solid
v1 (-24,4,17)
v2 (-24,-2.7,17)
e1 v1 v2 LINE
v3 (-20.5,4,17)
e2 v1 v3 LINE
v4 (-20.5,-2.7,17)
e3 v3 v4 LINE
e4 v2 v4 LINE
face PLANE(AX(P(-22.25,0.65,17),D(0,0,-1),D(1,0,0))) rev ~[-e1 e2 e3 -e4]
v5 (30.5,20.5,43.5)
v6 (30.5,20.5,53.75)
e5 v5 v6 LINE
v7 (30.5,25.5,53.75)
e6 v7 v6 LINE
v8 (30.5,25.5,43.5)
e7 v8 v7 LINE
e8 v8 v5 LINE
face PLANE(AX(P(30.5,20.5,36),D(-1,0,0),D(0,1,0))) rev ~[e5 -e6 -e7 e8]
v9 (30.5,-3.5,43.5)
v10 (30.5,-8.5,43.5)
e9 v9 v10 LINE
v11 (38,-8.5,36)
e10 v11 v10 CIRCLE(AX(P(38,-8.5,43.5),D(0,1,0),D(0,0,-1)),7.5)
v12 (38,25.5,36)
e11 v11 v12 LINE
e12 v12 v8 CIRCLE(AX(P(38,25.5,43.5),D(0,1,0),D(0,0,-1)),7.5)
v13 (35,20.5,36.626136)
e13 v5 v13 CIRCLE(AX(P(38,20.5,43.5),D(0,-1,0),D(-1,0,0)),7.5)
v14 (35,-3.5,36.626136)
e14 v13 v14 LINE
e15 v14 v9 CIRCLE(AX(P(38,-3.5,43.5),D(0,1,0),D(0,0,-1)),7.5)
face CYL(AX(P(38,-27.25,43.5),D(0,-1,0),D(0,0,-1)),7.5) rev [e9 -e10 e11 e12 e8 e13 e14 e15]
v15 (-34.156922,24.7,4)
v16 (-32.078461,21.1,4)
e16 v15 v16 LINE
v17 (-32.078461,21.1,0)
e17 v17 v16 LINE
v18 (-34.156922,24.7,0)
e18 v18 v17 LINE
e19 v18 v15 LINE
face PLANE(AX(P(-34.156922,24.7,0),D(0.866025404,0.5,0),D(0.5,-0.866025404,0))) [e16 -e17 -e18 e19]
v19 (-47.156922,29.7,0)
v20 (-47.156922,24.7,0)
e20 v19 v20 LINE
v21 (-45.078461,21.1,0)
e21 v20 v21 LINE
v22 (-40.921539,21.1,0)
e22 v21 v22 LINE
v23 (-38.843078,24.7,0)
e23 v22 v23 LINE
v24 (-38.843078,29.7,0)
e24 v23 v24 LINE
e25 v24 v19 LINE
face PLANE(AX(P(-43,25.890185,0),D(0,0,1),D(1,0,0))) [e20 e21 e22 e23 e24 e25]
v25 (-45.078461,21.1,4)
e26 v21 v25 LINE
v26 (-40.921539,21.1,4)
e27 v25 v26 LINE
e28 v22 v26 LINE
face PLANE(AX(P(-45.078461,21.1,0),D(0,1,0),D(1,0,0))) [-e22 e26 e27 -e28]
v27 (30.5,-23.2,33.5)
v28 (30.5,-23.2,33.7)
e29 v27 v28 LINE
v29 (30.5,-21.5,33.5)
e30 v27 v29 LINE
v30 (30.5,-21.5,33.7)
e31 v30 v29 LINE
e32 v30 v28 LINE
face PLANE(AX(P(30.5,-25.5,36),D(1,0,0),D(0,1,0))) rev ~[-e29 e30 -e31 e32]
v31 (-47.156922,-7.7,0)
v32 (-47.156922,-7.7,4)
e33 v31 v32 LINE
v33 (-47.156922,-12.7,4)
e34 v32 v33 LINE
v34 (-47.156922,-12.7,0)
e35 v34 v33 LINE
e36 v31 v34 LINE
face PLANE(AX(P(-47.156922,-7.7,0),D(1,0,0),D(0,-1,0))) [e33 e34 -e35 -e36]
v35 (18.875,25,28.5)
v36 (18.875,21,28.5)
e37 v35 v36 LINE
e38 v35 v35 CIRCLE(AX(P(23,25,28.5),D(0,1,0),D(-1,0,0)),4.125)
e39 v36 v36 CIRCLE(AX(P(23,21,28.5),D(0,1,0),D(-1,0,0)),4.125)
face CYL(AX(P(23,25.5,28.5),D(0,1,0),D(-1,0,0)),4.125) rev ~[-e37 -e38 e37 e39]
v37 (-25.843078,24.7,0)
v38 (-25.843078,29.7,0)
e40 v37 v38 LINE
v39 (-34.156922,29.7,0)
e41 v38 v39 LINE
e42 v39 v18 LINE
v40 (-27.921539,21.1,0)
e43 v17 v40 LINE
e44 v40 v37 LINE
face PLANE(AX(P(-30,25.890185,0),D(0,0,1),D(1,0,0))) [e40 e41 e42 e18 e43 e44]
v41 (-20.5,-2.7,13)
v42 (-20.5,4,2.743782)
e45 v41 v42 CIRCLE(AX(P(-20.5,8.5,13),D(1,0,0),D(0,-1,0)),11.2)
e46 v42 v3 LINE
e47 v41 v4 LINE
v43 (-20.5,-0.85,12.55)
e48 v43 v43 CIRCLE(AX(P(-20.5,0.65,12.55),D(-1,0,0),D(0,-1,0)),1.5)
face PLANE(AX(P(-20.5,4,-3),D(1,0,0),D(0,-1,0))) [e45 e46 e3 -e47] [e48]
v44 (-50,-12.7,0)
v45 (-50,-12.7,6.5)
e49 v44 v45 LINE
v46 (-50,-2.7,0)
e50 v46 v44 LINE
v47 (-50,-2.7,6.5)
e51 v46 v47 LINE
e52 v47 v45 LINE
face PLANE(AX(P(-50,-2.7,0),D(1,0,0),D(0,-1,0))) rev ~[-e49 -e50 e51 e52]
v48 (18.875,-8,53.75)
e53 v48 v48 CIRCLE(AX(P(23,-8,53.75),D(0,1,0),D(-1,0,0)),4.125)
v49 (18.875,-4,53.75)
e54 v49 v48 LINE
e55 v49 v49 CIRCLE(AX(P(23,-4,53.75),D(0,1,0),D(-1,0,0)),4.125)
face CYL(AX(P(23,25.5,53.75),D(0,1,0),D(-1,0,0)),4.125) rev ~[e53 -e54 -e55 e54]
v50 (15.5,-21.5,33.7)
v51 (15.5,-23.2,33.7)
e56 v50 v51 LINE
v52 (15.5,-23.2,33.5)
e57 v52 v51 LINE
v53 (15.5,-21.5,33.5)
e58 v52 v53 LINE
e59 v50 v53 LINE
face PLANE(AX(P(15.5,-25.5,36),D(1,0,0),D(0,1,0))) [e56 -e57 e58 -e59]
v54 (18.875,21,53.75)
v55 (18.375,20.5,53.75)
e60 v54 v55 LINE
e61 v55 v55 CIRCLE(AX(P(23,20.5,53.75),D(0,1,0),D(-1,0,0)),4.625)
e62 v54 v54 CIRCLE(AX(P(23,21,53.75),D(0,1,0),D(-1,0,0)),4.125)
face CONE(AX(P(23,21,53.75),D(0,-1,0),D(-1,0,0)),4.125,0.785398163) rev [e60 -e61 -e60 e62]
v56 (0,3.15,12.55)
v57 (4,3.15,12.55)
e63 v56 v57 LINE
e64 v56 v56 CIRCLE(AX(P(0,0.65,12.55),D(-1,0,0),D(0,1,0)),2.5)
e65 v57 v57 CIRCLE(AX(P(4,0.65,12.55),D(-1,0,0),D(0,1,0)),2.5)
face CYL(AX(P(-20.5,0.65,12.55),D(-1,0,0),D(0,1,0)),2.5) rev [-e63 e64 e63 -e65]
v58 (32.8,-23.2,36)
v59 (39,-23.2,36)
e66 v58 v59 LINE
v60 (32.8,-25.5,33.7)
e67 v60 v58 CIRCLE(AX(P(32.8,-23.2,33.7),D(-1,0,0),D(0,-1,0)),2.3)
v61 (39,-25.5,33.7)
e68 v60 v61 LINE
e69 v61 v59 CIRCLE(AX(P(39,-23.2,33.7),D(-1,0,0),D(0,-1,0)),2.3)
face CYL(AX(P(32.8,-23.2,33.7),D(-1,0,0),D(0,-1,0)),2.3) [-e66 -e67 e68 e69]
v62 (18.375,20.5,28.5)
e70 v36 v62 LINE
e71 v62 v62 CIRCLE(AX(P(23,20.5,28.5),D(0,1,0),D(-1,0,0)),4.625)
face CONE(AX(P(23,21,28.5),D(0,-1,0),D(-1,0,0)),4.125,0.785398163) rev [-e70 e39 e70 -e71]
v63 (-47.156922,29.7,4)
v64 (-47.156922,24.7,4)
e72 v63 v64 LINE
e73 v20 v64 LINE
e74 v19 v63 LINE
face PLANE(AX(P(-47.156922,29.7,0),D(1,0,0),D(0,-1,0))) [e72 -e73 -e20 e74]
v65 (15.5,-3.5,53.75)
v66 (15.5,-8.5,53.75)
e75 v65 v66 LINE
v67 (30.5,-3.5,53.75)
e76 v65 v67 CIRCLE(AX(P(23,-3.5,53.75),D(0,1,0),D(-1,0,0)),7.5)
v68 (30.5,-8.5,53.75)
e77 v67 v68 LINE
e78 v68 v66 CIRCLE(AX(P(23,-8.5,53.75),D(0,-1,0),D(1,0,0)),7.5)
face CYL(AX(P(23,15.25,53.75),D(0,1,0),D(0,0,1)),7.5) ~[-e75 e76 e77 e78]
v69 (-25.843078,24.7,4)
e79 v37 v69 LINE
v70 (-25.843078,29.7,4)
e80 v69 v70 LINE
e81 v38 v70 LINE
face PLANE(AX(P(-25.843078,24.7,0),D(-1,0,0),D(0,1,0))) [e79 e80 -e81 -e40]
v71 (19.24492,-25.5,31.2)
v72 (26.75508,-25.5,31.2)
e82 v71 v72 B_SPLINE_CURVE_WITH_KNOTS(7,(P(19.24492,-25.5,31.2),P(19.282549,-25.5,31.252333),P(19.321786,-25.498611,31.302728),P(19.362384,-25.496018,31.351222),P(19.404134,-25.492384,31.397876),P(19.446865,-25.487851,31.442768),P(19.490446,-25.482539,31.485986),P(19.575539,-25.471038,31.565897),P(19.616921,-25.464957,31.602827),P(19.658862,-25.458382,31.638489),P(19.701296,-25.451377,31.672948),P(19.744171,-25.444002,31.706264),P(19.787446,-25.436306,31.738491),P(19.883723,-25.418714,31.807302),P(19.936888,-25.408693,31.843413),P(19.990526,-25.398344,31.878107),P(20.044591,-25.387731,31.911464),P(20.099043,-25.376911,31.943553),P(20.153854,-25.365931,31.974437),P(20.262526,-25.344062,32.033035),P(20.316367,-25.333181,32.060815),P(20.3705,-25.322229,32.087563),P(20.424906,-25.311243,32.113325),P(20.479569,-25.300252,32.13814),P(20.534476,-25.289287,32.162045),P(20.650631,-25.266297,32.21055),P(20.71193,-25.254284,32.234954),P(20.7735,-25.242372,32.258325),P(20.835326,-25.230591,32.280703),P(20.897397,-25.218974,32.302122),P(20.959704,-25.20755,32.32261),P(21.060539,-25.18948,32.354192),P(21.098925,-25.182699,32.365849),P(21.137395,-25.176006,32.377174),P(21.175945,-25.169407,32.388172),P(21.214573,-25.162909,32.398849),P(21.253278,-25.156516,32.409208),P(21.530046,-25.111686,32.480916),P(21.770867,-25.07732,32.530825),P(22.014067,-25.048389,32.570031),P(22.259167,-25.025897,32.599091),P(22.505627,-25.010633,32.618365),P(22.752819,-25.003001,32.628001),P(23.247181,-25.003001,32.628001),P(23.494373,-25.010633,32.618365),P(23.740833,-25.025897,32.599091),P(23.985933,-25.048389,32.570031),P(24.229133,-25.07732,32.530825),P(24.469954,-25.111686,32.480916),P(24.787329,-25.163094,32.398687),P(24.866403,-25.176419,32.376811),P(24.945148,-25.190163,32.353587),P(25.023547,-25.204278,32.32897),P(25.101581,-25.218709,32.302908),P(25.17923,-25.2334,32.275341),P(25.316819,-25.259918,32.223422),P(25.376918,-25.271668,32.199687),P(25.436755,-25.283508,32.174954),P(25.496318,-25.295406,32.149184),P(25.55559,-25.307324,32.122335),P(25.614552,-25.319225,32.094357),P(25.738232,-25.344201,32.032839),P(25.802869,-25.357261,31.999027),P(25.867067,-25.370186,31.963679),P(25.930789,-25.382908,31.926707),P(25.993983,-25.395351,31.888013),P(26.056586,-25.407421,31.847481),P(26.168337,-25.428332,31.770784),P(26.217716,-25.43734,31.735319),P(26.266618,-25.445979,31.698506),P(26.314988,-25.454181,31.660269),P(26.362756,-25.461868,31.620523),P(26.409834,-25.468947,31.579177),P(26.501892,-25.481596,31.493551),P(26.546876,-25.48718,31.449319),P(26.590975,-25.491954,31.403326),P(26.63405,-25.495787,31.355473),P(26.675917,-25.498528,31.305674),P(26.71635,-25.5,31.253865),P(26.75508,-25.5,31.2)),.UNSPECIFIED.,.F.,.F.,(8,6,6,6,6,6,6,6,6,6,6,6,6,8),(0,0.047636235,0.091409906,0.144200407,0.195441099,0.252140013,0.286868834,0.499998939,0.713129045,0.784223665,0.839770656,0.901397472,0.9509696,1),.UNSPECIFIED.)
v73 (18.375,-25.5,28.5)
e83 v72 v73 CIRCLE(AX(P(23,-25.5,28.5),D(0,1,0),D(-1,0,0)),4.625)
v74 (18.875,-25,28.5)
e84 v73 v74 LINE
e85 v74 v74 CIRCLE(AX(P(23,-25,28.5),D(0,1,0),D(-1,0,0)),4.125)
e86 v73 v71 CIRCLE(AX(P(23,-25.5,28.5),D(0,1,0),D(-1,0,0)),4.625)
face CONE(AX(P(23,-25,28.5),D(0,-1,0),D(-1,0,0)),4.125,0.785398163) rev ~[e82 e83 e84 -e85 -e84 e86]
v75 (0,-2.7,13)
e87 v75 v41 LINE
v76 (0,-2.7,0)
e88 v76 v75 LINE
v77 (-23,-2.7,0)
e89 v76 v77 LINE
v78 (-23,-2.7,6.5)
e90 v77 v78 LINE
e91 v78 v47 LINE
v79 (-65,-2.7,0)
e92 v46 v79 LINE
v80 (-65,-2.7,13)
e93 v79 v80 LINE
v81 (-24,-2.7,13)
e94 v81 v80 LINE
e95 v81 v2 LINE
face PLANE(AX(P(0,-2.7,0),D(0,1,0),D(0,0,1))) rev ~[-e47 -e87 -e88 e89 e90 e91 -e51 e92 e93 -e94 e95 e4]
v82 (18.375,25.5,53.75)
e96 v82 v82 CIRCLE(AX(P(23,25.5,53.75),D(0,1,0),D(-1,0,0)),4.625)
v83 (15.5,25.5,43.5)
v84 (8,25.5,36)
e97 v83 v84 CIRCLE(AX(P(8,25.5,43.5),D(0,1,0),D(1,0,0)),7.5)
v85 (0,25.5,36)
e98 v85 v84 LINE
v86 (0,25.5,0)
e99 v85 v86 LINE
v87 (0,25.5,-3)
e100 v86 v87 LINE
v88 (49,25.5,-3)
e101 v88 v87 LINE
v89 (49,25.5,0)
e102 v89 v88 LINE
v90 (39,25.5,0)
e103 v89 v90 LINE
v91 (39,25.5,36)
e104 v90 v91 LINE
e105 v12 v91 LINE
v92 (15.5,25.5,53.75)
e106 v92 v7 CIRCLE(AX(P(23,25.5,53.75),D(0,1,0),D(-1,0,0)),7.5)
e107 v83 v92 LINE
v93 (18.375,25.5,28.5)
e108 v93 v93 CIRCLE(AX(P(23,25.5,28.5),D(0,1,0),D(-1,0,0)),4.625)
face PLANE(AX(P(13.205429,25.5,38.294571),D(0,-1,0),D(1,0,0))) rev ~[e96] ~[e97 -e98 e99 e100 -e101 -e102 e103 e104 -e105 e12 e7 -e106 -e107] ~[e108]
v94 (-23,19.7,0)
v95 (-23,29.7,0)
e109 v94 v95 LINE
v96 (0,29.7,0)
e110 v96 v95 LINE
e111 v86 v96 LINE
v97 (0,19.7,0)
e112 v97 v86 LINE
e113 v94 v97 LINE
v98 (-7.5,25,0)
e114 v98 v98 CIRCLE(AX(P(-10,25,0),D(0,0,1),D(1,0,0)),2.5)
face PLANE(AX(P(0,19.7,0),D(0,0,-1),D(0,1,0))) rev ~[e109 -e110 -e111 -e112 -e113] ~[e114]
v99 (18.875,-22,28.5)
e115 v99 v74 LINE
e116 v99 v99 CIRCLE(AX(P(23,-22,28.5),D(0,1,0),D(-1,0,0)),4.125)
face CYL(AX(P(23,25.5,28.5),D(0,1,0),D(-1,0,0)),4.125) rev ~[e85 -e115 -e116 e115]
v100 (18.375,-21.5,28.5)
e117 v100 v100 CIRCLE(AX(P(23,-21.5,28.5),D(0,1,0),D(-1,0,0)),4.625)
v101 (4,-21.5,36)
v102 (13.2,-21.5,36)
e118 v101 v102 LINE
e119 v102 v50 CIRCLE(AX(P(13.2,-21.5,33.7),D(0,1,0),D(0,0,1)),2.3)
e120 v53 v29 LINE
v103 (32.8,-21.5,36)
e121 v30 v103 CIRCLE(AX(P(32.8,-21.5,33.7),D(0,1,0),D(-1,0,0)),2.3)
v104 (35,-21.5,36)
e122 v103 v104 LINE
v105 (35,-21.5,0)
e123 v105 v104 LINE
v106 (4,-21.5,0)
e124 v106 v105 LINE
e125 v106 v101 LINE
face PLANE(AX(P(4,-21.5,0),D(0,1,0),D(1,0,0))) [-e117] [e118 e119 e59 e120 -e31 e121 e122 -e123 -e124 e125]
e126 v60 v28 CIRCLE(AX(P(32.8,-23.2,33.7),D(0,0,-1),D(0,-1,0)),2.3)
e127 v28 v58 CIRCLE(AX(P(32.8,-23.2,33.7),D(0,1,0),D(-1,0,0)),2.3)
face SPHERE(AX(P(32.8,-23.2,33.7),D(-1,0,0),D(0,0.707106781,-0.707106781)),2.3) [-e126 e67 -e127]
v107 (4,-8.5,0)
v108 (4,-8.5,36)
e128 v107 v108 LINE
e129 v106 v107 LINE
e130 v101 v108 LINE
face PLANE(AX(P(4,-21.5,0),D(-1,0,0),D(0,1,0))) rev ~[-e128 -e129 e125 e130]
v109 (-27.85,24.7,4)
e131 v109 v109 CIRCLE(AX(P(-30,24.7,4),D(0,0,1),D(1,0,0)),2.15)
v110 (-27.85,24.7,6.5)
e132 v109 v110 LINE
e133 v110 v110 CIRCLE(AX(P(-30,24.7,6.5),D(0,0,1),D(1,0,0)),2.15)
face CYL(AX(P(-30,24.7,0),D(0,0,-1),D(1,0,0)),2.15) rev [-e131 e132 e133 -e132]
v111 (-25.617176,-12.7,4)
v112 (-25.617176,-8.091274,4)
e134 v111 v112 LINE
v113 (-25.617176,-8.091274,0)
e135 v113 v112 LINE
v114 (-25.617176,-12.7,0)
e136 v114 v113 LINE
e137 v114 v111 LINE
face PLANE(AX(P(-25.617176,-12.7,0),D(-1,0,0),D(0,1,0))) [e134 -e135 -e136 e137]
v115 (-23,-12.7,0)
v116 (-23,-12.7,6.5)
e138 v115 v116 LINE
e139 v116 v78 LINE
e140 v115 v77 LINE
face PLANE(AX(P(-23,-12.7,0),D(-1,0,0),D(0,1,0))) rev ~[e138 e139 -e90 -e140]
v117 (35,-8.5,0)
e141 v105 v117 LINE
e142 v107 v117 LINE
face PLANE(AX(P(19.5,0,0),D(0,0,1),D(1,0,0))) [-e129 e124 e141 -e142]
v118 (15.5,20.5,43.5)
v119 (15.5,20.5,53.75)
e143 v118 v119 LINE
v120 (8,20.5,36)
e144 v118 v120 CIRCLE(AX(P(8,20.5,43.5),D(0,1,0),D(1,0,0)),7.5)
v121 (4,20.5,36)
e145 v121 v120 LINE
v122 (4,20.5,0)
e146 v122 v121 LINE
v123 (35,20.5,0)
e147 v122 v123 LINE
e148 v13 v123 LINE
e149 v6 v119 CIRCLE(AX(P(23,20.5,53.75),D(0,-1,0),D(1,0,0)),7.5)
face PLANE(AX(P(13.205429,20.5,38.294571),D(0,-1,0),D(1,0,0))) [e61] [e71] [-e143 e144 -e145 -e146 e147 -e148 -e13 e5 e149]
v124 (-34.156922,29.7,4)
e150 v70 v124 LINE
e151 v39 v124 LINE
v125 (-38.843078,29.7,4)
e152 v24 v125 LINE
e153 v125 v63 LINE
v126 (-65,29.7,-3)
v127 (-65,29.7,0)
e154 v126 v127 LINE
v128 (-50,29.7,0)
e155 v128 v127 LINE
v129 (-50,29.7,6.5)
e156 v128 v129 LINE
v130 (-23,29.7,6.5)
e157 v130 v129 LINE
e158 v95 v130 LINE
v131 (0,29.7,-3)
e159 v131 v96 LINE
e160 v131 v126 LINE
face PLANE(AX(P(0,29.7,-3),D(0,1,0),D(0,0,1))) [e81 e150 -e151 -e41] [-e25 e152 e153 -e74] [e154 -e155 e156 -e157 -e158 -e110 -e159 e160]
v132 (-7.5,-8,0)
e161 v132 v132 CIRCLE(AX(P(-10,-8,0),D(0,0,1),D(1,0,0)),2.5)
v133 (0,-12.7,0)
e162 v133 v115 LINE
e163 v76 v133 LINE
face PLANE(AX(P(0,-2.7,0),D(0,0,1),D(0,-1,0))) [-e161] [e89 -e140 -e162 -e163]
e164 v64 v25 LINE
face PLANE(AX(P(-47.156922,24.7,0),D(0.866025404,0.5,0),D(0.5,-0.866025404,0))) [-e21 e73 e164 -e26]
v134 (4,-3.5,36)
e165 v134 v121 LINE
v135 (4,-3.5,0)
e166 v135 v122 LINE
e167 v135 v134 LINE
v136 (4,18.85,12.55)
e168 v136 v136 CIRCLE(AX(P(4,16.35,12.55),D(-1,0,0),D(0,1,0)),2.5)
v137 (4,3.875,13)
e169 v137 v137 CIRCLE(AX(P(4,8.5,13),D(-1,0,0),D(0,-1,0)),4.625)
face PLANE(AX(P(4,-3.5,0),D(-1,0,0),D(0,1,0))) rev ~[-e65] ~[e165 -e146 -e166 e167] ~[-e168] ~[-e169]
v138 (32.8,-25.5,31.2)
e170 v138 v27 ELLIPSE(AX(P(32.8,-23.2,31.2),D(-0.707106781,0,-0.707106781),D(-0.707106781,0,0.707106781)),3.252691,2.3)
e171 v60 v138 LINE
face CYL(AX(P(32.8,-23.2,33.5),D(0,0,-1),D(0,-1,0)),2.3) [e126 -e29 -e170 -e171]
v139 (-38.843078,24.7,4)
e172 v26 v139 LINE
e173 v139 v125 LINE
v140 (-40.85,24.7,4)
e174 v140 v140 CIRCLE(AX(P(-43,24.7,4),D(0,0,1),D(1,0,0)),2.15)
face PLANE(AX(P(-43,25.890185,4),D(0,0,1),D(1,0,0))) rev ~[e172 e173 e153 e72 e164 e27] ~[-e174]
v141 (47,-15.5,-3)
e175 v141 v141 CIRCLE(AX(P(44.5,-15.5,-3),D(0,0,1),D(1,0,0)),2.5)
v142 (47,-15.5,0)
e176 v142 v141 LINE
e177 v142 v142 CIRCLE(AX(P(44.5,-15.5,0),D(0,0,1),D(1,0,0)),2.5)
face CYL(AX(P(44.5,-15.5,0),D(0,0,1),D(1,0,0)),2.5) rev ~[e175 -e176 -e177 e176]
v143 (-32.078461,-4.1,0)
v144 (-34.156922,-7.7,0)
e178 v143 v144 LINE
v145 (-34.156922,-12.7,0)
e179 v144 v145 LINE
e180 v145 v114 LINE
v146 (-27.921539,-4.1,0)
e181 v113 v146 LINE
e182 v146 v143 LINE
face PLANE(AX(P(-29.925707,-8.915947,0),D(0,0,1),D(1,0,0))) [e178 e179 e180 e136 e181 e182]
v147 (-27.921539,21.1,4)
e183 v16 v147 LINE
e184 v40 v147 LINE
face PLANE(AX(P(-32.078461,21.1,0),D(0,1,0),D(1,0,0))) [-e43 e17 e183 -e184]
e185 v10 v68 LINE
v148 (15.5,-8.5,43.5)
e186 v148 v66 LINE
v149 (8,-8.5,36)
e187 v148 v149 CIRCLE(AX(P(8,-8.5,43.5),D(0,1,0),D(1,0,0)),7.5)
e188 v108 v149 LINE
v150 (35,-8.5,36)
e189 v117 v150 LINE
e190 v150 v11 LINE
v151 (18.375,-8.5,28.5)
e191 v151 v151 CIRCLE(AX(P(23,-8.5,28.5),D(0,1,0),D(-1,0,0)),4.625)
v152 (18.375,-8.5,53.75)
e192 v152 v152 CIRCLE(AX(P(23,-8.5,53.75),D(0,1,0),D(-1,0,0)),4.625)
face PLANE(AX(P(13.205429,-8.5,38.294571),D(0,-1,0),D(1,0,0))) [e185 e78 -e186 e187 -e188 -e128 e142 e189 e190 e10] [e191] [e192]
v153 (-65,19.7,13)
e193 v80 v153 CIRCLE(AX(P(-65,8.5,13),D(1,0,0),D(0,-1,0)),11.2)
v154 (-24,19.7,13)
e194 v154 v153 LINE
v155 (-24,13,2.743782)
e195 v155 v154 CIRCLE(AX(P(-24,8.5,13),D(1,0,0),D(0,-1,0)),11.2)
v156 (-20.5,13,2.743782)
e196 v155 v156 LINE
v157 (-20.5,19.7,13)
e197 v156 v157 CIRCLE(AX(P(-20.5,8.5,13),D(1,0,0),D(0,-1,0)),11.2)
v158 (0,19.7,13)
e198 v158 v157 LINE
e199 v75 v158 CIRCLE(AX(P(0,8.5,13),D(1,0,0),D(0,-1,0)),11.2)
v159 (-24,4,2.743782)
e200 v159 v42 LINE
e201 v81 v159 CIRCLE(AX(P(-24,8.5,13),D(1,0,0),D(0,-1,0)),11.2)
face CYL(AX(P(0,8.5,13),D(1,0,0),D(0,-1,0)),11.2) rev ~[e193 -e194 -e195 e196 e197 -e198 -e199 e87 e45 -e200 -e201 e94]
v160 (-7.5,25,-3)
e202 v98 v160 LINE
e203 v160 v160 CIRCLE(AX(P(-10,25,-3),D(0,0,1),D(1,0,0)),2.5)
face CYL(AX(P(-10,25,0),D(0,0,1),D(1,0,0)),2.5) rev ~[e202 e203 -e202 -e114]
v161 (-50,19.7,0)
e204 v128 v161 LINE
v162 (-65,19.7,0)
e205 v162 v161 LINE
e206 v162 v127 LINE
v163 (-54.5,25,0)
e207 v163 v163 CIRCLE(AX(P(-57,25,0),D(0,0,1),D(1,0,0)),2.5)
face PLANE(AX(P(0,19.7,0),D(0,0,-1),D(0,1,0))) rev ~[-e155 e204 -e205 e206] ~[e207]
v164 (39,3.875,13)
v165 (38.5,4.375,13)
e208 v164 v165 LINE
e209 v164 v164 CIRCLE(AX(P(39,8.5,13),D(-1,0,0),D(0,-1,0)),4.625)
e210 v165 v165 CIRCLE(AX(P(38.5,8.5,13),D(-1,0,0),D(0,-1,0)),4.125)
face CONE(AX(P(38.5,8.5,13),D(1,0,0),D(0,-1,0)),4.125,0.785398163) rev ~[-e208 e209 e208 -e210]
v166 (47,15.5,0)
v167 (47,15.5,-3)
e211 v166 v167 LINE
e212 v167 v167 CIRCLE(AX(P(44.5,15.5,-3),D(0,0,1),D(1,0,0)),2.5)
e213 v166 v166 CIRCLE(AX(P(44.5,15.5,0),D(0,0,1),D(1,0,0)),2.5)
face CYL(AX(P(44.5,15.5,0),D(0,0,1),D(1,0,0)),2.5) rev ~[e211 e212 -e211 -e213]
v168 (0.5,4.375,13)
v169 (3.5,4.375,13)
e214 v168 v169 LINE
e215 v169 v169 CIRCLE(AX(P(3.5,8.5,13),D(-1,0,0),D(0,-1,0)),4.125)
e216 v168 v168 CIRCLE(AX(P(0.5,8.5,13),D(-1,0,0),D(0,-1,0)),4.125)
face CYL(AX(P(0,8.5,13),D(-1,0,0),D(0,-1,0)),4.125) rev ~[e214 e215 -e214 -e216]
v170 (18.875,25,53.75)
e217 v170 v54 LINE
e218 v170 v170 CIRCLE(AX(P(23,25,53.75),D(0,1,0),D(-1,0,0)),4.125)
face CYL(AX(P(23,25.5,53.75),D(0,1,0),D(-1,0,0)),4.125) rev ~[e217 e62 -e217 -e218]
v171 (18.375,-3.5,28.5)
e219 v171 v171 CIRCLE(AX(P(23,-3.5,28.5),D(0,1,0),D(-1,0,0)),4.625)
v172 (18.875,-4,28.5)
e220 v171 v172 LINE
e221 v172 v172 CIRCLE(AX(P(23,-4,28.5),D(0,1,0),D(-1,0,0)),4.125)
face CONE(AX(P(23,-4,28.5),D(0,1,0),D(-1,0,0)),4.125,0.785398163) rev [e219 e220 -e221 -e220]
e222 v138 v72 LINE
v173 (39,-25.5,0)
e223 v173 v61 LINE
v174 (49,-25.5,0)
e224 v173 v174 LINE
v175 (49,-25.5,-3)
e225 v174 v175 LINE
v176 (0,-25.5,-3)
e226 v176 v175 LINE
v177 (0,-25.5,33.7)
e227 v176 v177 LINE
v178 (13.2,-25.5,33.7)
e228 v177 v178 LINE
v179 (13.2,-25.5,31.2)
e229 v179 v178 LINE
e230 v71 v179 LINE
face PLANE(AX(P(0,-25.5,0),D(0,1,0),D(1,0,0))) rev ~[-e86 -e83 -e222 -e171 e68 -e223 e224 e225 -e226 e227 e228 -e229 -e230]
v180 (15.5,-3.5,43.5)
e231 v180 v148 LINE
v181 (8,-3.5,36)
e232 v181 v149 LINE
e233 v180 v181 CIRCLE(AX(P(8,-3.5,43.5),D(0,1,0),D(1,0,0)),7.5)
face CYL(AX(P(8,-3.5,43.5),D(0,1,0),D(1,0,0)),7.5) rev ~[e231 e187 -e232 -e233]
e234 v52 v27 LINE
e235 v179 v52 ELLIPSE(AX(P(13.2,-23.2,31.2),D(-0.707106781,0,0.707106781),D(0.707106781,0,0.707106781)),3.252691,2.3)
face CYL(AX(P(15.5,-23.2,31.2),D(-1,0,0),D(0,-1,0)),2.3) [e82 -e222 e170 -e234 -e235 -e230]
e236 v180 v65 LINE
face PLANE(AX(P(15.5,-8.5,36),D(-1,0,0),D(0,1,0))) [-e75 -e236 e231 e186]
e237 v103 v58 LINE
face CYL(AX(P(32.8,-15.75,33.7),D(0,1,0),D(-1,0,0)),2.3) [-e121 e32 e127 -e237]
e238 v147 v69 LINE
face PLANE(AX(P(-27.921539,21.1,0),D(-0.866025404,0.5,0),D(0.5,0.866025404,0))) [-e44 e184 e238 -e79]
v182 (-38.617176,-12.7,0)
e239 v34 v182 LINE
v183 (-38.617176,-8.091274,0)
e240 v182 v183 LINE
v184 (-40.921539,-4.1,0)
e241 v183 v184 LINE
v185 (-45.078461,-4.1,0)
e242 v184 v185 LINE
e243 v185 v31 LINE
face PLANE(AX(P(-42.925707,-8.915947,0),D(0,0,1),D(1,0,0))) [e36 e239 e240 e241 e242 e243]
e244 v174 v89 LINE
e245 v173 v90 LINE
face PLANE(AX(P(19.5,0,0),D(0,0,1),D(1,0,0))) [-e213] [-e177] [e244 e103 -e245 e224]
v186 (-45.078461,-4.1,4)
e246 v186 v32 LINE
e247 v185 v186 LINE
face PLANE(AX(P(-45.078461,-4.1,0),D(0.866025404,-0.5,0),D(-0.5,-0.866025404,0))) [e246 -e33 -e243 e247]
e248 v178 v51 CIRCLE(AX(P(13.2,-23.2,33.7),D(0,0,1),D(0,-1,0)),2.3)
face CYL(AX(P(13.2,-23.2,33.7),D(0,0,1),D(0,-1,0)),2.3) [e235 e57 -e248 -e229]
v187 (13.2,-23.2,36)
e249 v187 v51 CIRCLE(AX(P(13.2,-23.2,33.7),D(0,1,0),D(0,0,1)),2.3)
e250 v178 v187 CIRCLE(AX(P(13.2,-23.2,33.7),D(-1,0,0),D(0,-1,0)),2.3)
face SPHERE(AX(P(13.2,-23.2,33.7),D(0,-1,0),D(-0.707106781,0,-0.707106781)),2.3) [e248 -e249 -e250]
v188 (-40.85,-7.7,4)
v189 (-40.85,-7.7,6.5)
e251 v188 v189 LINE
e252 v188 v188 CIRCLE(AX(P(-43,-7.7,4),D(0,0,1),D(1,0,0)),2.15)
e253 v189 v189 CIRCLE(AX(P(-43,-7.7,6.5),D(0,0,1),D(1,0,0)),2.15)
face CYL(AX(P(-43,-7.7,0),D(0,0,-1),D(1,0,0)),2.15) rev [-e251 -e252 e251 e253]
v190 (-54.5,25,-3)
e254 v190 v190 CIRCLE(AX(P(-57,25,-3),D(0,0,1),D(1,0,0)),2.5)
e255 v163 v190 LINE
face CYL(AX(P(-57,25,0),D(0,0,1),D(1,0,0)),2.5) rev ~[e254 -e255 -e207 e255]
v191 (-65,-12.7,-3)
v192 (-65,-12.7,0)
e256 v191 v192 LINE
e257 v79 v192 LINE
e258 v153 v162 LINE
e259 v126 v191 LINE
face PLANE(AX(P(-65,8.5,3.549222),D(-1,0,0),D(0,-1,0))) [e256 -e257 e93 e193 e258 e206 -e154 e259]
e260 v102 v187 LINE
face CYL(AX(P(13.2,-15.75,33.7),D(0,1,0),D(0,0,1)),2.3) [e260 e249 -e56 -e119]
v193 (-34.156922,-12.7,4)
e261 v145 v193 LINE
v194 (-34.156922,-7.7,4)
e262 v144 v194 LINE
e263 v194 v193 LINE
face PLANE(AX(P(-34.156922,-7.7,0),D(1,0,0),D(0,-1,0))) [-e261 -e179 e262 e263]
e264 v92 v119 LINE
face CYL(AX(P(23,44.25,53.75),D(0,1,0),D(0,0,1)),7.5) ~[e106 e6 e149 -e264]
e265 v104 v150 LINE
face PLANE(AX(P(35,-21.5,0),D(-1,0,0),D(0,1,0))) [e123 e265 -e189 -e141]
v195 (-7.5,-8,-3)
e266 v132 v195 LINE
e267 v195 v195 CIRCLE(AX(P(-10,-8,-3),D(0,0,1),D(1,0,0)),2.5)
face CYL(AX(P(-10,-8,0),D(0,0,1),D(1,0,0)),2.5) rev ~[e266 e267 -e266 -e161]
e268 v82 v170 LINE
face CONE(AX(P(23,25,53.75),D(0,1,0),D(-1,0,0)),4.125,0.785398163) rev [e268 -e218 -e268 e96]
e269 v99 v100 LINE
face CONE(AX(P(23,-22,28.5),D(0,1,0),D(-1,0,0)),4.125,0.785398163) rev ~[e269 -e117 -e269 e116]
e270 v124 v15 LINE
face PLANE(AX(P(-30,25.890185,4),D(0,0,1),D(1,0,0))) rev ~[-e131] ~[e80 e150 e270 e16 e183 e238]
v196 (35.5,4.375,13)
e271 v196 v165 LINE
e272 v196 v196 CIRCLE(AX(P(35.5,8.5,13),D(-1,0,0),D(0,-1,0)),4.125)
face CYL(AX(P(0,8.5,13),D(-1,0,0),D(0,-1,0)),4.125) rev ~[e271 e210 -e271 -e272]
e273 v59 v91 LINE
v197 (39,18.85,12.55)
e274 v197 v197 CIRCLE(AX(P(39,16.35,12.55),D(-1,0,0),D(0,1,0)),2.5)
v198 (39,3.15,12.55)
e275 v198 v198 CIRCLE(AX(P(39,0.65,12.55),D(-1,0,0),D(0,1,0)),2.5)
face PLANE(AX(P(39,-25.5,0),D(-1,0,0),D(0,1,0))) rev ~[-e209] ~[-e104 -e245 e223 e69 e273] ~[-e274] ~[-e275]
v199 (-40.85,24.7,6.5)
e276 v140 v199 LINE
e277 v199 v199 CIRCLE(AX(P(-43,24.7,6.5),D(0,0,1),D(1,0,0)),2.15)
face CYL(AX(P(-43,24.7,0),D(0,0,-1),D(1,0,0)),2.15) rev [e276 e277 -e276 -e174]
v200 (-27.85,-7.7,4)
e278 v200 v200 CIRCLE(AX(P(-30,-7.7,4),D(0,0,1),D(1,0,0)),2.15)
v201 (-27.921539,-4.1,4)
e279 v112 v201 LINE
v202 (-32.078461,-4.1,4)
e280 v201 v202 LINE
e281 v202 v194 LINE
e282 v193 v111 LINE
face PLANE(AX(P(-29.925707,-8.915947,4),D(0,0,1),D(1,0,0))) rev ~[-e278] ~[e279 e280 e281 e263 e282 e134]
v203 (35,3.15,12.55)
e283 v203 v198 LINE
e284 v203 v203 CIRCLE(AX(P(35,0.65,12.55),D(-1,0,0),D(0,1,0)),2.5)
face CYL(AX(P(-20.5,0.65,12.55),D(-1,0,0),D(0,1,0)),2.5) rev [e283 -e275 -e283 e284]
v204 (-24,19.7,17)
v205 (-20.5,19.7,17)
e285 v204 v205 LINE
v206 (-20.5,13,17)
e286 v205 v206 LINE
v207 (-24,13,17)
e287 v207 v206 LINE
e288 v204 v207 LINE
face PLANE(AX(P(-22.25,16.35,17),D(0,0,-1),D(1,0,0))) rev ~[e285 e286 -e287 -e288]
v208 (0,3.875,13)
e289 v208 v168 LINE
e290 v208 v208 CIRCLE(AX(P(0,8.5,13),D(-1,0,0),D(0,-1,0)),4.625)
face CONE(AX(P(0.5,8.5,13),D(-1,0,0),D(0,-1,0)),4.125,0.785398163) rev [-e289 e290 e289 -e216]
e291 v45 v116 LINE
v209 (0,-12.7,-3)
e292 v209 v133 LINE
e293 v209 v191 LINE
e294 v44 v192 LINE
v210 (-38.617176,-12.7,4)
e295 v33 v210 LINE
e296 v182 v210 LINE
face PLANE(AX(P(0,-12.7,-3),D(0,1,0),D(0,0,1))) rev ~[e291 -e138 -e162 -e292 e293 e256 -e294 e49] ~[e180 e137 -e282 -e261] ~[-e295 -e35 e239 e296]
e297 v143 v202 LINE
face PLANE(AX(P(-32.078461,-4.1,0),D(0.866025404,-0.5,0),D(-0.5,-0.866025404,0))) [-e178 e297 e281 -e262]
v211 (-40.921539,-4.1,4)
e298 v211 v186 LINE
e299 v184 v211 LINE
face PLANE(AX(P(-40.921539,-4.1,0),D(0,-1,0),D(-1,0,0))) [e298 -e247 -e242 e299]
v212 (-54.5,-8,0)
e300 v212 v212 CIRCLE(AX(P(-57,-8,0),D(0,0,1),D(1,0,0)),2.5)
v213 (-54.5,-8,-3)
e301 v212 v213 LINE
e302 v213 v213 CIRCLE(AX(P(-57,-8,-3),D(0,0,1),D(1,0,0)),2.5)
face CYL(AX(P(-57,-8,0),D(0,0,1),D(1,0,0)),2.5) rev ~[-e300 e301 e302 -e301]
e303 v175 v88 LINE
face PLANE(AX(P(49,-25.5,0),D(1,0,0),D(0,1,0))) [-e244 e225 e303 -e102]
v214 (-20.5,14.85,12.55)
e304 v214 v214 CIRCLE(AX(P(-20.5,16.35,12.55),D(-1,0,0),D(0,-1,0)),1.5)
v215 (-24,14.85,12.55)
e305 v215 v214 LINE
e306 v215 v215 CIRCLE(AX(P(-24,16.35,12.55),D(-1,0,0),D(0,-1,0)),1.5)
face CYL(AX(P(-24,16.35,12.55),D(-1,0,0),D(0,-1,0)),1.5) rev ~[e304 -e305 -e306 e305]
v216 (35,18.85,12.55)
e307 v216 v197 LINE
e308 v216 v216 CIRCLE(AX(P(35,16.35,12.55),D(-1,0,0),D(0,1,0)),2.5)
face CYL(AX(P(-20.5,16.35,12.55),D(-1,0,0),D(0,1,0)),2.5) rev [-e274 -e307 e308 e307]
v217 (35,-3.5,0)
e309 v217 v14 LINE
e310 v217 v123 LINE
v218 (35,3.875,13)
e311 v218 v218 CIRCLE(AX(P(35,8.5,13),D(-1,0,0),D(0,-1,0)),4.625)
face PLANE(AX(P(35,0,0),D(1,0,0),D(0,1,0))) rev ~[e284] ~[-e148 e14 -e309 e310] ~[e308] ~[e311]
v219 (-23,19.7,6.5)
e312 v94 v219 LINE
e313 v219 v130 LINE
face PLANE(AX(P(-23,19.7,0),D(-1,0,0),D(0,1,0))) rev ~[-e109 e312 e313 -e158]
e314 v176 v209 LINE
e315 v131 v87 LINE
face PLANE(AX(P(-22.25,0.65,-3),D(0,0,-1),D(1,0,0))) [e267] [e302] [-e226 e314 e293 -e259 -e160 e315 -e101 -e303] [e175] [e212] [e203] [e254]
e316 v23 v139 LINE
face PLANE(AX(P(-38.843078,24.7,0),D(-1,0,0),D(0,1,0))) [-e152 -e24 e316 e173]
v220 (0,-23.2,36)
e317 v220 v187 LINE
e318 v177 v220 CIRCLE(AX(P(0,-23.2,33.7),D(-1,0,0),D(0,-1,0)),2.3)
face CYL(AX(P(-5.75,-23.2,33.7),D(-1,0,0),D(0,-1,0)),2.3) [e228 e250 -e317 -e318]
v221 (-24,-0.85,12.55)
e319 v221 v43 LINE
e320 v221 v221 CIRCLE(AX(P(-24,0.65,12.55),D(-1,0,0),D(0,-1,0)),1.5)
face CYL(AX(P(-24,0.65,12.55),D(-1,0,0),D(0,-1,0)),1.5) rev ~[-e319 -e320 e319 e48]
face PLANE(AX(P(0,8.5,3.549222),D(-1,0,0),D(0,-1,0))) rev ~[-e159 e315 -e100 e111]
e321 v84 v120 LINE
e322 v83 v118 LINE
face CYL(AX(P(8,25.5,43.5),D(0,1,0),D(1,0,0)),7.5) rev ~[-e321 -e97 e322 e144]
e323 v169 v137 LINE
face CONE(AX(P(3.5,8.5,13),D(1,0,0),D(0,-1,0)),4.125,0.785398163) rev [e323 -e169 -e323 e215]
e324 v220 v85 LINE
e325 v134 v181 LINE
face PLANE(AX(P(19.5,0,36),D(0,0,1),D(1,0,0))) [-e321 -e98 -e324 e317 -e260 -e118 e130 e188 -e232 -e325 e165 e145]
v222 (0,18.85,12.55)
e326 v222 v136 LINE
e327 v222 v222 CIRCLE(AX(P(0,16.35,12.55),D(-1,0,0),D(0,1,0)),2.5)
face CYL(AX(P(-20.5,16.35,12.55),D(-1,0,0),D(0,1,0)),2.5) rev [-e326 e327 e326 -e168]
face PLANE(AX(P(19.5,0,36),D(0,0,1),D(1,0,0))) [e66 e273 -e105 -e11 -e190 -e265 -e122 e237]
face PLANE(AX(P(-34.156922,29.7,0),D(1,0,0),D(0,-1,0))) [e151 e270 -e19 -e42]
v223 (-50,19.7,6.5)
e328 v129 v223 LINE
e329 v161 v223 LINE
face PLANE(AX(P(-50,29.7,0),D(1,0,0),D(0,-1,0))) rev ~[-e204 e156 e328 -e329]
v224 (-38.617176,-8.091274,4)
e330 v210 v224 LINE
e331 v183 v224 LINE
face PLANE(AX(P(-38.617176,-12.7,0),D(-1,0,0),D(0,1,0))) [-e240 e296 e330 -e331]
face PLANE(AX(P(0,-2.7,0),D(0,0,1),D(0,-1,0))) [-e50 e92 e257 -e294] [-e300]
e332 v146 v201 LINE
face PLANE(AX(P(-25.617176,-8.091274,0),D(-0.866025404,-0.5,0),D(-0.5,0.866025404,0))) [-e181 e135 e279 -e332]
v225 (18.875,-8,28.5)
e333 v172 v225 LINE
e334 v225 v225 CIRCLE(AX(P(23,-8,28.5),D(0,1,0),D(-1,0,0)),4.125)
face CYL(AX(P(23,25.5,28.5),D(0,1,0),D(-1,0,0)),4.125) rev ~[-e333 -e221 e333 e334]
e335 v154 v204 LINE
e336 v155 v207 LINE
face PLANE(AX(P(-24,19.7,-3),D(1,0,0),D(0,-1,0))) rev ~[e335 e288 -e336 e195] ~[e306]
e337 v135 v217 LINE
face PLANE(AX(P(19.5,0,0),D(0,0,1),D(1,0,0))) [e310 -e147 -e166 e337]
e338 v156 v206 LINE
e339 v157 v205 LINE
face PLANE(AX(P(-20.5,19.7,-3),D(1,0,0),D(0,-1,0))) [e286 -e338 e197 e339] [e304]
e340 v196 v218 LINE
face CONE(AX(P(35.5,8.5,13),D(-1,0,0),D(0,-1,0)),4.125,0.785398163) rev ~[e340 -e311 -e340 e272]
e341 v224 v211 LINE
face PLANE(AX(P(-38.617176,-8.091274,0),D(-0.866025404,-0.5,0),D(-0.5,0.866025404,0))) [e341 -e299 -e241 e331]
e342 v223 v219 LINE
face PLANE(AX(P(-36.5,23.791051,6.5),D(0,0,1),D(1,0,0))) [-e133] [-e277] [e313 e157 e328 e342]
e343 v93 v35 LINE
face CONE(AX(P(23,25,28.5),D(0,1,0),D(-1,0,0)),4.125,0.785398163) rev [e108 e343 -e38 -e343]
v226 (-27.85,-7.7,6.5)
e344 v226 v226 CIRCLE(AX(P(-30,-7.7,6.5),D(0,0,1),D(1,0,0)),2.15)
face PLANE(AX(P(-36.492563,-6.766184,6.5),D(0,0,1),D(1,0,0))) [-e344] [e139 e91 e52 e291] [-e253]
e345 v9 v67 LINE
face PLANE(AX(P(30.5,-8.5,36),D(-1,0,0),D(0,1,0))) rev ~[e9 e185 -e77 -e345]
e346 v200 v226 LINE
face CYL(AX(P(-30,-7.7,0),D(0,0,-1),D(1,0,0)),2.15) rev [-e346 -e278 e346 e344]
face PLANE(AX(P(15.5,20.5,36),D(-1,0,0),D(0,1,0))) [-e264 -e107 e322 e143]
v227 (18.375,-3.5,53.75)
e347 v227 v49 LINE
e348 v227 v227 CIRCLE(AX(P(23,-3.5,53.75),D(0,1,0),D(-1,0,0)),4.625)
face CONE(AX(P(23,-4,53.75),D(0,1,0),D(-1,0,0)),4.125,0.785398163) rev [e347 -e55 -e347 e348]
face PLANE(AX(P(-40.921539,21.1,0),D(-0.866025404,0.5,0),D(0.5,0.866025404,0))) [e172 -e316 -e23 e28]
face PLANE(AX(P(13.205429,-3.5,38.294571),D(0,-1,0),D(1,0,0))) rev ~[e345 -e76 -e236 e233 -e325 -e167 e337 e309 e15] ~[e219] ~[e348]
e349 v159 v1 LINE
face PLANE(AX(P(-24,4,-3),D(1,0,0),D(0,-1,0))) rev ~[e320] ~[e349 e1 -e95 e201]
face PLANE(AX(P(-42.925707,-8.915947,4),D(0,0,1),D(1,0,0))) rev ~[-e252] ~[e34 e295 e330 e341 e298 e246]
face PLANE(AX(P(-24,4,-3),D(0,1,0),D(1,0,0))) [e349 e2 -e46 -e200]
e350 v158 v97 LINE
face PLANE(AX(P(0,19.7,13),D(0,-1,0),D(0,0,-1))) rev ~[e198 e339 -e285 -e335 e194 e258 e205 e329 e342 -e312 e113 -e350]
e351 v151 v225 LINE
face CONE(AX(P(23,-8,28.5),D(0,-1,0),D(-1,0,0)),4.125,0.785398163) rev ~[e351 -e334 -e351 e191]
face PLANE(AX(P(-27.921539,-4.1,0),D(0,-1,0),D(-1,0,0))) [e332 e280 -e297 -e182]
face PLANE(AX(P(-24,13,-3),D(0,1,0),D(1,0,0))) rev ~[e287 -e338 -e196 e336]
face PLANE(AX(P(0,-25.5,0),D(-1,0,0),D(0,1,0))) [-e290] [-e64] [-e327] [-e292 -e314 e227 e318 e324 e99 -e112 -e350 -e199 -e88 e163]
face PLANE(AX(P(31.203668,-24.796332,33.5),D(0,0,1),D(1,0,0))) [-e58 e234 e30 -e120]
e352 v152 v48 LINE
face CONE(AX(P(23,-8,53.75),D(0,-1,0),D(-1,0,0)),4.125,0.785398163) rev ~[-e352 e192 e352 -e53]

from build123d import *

# Parameters (mm, degrees)
F0_W          = 39
F0_H          = 51
F0_W_2        = 31
F0_H_2        = 13
F0_H_3        = 24
F0_W_3        = 10
F0_R          = 2.5
F1_DEPTH      = 3
F2_DEPTH      = 36
F3_R          = 4.125
F4_DEPTH      = 49.001
F5_W          = 15
F5_H          = 5
F6_DEPTH      = 25.25
F7_R          = 4.125
F8_DEPTH      = 51.001
F3_W          = 10
F3_H          = 3
F3_W_2        = 5.8
F3_W_3        = 4.2
F9_DEPTH      = 65
F10_W         = 3.5
F10_H         = 6.7
F11_DEPTH     = 20
F12_R         = 1.5
F13_DEPTH     = 4
F5_H_2        = 4
F14_DEPTH     = 2.5
F15_R         = 2.5
F16_DEPTH     = 3.001
F15_R_2       = 2.15
F17_DEPTH     = 6.5
F18_DEPTH     = 4
F19_R         = 2.5
F19_R_2       = 1.5
F20_DEPTH     = 69.501
F21_SIZE      = 0.5
F22_T1_DEPTH  = 18.95
F22_T3_DEPTH  = 11.95
F22_T5_DEPTH  = 0.2
F22_T7_DEPTH  = 15
F22_T9_DEPTH  = 7.45
F22_S13_W     = 2.3
F22_S13_H     = 2.3
F22_T14_DEPTH = 2.3
F22_S19_W     = 2.3
F22_S19_H     = 2.3
F22_T20_DEPTH = 2.3
F22_T27_DEPTH = 5.95
F22_T31_DEPTH = 20.75
F22_T38_DEPTH = 20.75
F22_T42_DEPTH = 5.95
F23_T1_DEPTH  = 5
F23_T3_DEPTH  = 5
F23_T8_DEPTH  = 42.5
F23_T14_DEPTH = 23.75
F23_T16_DEPTH = 42.5
F23_T18_DEPTH = 42.5


# Not quite as in the source:
# - a fillet or chamfer that OpenCascade refuses, or shapes differently, is made with other operations: its cross-section is extruded or revolved along the edge and cut away or added
# - a feature names something its author has since deleted; it is built from what else it names


with BuildPart() as f1:
    # F0 (on Top) → F1 (new body)
    with BuildSketch(Plane.XY):
        with Locations((19.5, 0)):
            Rectangle(F0_W, F0_H)
        with Locations((19.5, -15)):
            Rectangle(F0_W_2, F0_H_2, mode=Mode.SUBTRACT)
        with Locations((19.5, 8.5)):
            Rectangle(F0_W_2, F0_H_3, mode=Mode.SUBTRACT)
        with Locations((19.5, 8.5)):
            Rectangle(F0_W_2, F0_H_3)
        with Locations((44, 0)):
            Rectangle(F0_W_3, F0_H)
        with Locations((44.5, -15.5)):
            Circle(F0_R, mode=Mode.SUBTRACT)
        with Locations((44.5, 15.5)):
            Circle(F0_R, mode=Mode.SUBTRACT)
        with Locations((19.5, -15)):
            Rectangle(F0_W_2, F0_H_2)
    extrude(amount=-F1_DEPTH)

    # F0 (on Top) → F2 (join)
    with BuildSketch(Plane.XY):
        with Locations((19.5, 0)):
            Rectangle(F0_W, F0_H)
        with Locations((19.5, -15)):
            Rectangle(F0_W_2, F0_H_2, mode=Mode.SUBTRACT)
        with Locations((19.5, 8.5)):
            Rectangle(F0_W_2, F0_H_3, mode=Mode.SUBTRACT)
    extrude(amount=F2_DEPTH)

    # F3 (on face) → F4 (cut, through all)
    with BuildSketch(Plane(origin=(0, 0, 0), x_dir=(0, -1, 0), z_dir=(-1, 0, 0))):
        with Locations((-8.5, 13)):
            Circle(F3_R)
    extrude(amount=-F4_DEPTH, mode=Mode.SUBTRACT)

    # F5 (on face) → F6 (join)
    with BuildSketch(Plane.XY.offset(36)):
        with Locations((23, 23)):
            Rectangle(F5_W, F5_H)
        with Locations((23, -6)):
            Rectangle(F5_W, F5_H)
    extrude(amount=F6_DEPTH)

    # F7 (on face) → F8 (cut, through all)
    with BuildSketch(Plane(origin=(0, 25.5, 0), x_dir=(-1, 0, 0), z_dir=(0, 1, 0))):
        with Locations((-23, 28.5)):
            Circle(F7_R)
        with Locations((-23, 53.75)):
            Circle(F7_R)
    extrude(amount=-F8_DEPTH, mode=Mode.SUBTRACT)

    # F3 (on face) → F9 (join)
    with BuildSketch(Plane(origin=(0, 0, 0), x_dir=(0, -1, 0), z_dir=(-1, 0, 0))):
        with BuildLine():
            Line((-19.7, 0), (-19.7, -3))
            Line((-19.7, -3), (2.7, -3))
            Line((2.7, -3), (2.7, 0))
            Line((2.7, 0), (2.7, 13))
            ThreePointArc((2.7, 13), (-8.5, 1.8), (-19.7, 13))
            Line((-19.7, 13), (-19.7, 0))
        make_face()
        with Locations((7.7, -1.5)):
            Rectangle(F3_W, F3_H)
        with Locations((-22.6, -1.5)):
            Rectangle(F3_W_2, F3_H)
        with Locations((-27.6, -1.5)):
            Rectangle(F3_W_3, F3_H)
    extrude(amount=F9_DEPTH)

    # F10 (on face) → F11 (join)
    with BuildSketch(Plane(origin=(0, 0, -3), x_dir=(1, 0, 0), z_dir=(0, 0, -1))):
        with Locations((-22.25, -0.65)):
            Rectangle(F10_W, F10_H)
        with Locations((-22.25, -16.35)):
            Rectangle(F10_W, F10_H)
    extrude(amount=-F11_DEPTH)

    # F12 (on face) → F13 (cut)
    with BuildSketch(Plane(origin=(-24, 0, 0), x_dir=(0, -1, 0), z_dir=(-1, 0, 0))):
        with Locations((-16.35, 12.55)):
            Circle(F12_R)
        with Locations((-0.65, 12.55)):
            Circle(F12_R)
    extrude(amount=-F13_DEPTH, mode=Mode.SUBTRACT)

    # F5 (on face) → F14 (cut)
    with BuildSketch(Plane.XY.offset(36)):
        with Locations((23, -23.5)):
            Rectangle(F5_W, F5_H_2)
    extrude(amount=-F14_DEPTH, mode=Mode.SUBTRACT)

    # F15 (on face) → F16 (cut, through all)
    with BuildSketch(Plane.XY):
        with Locations((-57, -8)):
            Circle(F15_R)
        with Locations((-10, -8)):
            Circle(F15_R)
        with Locations((-10, 25)):
            Circle(F15_R)
        with Locations((-57, 25)):
            Circle(F15_R)
    extrude(amount=-F16_DEPTH, mode=Mode.SUBTRACT)

    # F15 (on face) → F17 (join)
    with BuildSketch(Plane.XY):
        Polygon((-34.1569219382, -7.7), (-32.0784609691, -4.1), (-27.9215390309, -4.1), (-25.617175976, -8.0912738902), (-25.617175976, -12.7), (-23, -12.7), (-23, -2.7), (-50, -2.7), (-50, -12.7), (-47.1569219382, -12.7), (-47.1569219382, -7.7), (-45.0784609691, -4.1), (-40.9215390309, -4.1), (-38.617175976, -8.0912738902), (-38.617175976, -12.7), (-34.1569219382, -12.7), align=None)
        Polygon((-38.8430780618, 29.7), (-38.8430780618, 24.7), (-40.9215390309, 21.1), (-45.0784609691, 21.1), (-47.1569219382, 24.7), (-47.1569219382, 29.7), (-50, 29.7), (-50, 19.7), (-23, 19.7), (-23, 29.7), (-25.8430780618, 29.7), (-25.8430780618, 24.7), (-27.9215390309, 21.1), (-32.0784609691, 21.1), (-34.1569219382, 24.7), (-34.1569219382, 29.7), align=None)
        Polygon((-47.1569219382, -12.7), (-38.617175976, -12.7), (-38.617175976, -8.0912738902), (-40.9215390309, -4.1), (-45.0784609691, -4.1), (-47.1569219382, -7.7), align=None)
        with Locations((-43, -7.7)):
            Circle(F15_R_2, mode=Mode.SUBTRACT)
        Polygon((-27.9215390309, -4.1), (-32.0784609691, -4.1), (-34.1569219382, -7.7), (-34.1569219382, -12.7), (-25.617175976, -12.7), (-25.617175976, -8.0912738902), align=None)
        with Locations((-30, -7.7)):
            Circle(F15_R_2, mode=Mode.SUBTRACT)
        Polygon((-40.9215390309, 21.1), (-38.8430780618, 24.7), (-38.8430780618, 29.7), (-47.1569219382, 29.7), (-47.1569219382, 24.7), (-45.0784609691, 21.1), align=None)
        with Locations((-43, 24.7)):
            Circle(F15_R_2, mode=Mode.SUBTRACT)
        Polygon((-25.8430780618, 29.7), (-34.1569219382, 29.7), (-34.1569219382, 24.7), (-32.0784609691, 21.1), (-27.9215390309, 21.1), (-25.8430780618, 24.7), align=None)
        with Locations((-30, 24.7)):
            Circle(F15_R_2, mode=Mode.SUBTRACT)
    extrude(amount=F17_DEPTH)

    # F15 (on face) → F18 (cut)
    with BuildSketch(Plane.XY):
        Polygon((-47.1569219382, -12.7), (-38.617175976, -12.7), (-38.617175976, -8.0912738902), (-40.9215390309, -4.1), (-45.0784609691, -4.1), (-47.1569219382, -7.7), align=None)
        with Locations((-43, -7.7)):
            Circle(F15_R_2, mode=Mode.SUBTRACT)
        Polygon((-27.9215390309, -4.1), (-32.0784609691, -4.1), (-34.1569219382, -7.7), (-34.1569219382, -12.7), (-25.617175976, -12.7), (-25.617175976, -8.0912738902), align=None)
        with Locations((-30, -7.7)):
            Circle(F15_R_2, mode=Mode.SUBTRACT)
        Polygon((-40.9215390309, 21.1), (-38.8430780618, 24.7), (-38.8430780618, 29.7), (-47.1569219382, 29.7), (-47.1569219382, 24.7), (-45.0784609691, 21.1), align=None)
        with Locations((-43, 24.7)):
            Circle(F15_R_2, mode=Mode.SUBTRACT)
        Polygon((-25.8430780618, 29.7), (-34.1569219382, 29.7), (-34.1569219382, 24.7), (-32.0784609691, 21.1), (-27.9215390309, 21.1), (-25.8430780618, 24.7), align=None)
        with Locations((-30, 24.7)):
            Circle(F15_R_2, mode=Mode.SUBTRACT)
    extrude(amount=F18_DEPTH, mode=Mode.SUBTRACT)

    # F19 (on face) → F20 (cut, through all)
    with BuildSketch(Plane.YZ.offset(-20.5)):
        with Locations((0.65, 12.55)):
            Circle(F19_R)
        with Locations((16.35, 12.55)):
            Circle(F19_R)
        with Locations((16.35, 12.55)):
            Circle(F19_R_2, mode=Mode.SUBTRACT)
        with Locations((16.35, 12.55)):
            Circle(F19_R_2)
    extrude(amount=F20_DEPTH, mode=Mode.SUBTRACT)

    # F21
    f21_edges = [f1.edges().sort_by_distance(p)[0] for p in [
        (27.125, -8.5, 28.5),
        (39, 12.625, 13),
        (27.125, 20.5, 28.5),
        (4, 12.625, 13),
        (27.125, -3.5, 28.5),
        (27.125, -3.5, 53.75),
        (27.125, -21.5, 28.5),
        (27.125, 25.5, 53.75),
        (27.125, 25.5, 28.5),
        (27.125, -8.5, 53.75),
        (27.125, 20.5, 53.75),
        (0, 12.625, 13),
        (35, 12.625, 13),
        (27.125, -25.5, 28.5),
    ]]
    chamfer(f21_edges, length=F21_SIZE)

    # F22: fillet of radius 2.3 on 7 edges, made by hand

    # F22_s2 → F22_t1 (cut)
    with BuildSketch(Plane.YZ.offset(-5.75)):
        with BuildLine():
            ThreePointArc((-25.5, 33.7), (-24.8263455967, 35.3263455967), (-23.2, 36))
            Line((-23.2, 36), (-25.5, 36))
            Line((-25.5, 36), (-25.5, 33.7))
        make_face()
    extrude(amount=F22_T1_DEPTH, mode=Mode.SUBTRACT)

    # F22_s4 → F22_t3 (cut)
    with BuildSketch(Plane.YZ.offset(32.8)):
        with BuildLine():
            ThreePointArc((-25.5, 33.7), (-24.8263455967, 35.3263455967), (-23.2, 36))
            Line((-23.2, 36), (-25.5, 36))
            Line((-25.5, 36), (-25.5, 33.7))
        make_face()
    extrude(amount=F22_T3_DEPTH, mode=Mode.SUBTRACT)

    # F22_s6 → F22_t5 (cut)
    with BuildSketch(Plane.XY.offset(33.5)):
        with BuildLine():
            ThreePointArc((13.2, -25.5), (14.8263455967, -24.8263455967), (15.5, -23.2))
            Line((15.5, -23.2), (15.5, -25.5))
            Line((15.5, -25.5), (13.2, -25.5))
        make_face()
        with BuildLine():
            ThreePointArc((32.8, -25.5), (31.1736544033, -24.8263455967), (30.5, -23.2))
            Line((30.5, -23.2), (30.5, -25.5))
            Line((30.5, -25.5), (32.8, -25.5))
        make_face()
    extrude(amount=F22_T5_DEPTH, mode=Mode.SUBTRACT)

    # F22_s8 → F22_t7 (cut)
    with BuildSketch(Plane.YZ.offset(15.5)):
        with BuildLine():
            ThreePointArc((-25.5, 31.2), (-24.8263455967, 32.8263455967), (-23.2, 33.5))
            Line((-23.2, 33.5), (-25.5, 33.5))
            Line((-25.5, 33.5), (-25.5, 31.2))
        make_face()
    extrude(amount=F22_T7_DEPTH, mode=Mode.SUBTRACT)

    # F22_s10 → F22_t9 (cut)
    with BuildSketch(Plane.XZ.offset(15.75)):
        with BuildLine():
            ThreePointArc((13.2, 36), (14.8263455967, 35.3263455967), (15.5, 33.7))
            Line((15.5, 33.7), (15.5, 36))
            Line((15.5, 36), (13.2, 36))
        make_face()
        with BuildLine():
            ThreePointArc((30.5, 33.7), (31.1736544033, 35.3263455967), (32.8, 36))
            Line((32.8, 36), (30.5, 36))
            Line((30.5, 36), (30.5, 33.7))
        make_face()
    extrude(amount=F22_T9_DEPTH, mode=Mode.SUBTRACT)


with BuildPart() as f22_tool12:
    # F22_s13 → F22_t14 (new body)
    with BuildSketch(Plane.XZ.offset(23.2)):
        with Locations((14.35, 34.85)):
            Rectangle(F22_S13_W, F22_S13_H)
    extrude(amount=F22_T14_DEPTH)

    # F22_s15 → F22_t16 (revolve, cut)
    with BuildSketch(Plane(origin=(13.2, -23.2, 33.7), x_dir=(-0.7071067812, 0, -0.7071067812), z_dir=(-0.7071067812, 0, 0.7071067812))):
        with BuildLine():
            ThreePointArc((0, -2.3), (2.3, 0), (0, 2.3))
            Line((0, 2.3), (0, -2.3))
        make_face()
    revolve(axis=Axis((13.2, -23.2, 33.7), (0, -1, 0)), mode=Mode.SUBTRACT)


with BuildPart() as f1_1:
    add(f1.part)

    # F22_t11: cut F22_tool12
    add(f22_tool12.part, mode=Mode.SUBTRACT)


with BuildPart() as f22_tool18:
    # F22_s19 → F22_t20 (new body)
    with BuildSketch(Plane.YZ.offset(32.8)):
        with Locations((-24.35, 34.85)):
            Rectangle(F22_S19_W, F22_S19_H)
    extrude(amount=-F22_T20_DEPTH)

    # F22_s21 → F22_t22 (revolve, cut)
    with BuildSketch(Plane(origin=(32.8, -23.2, 33.7), x_dir=(0, 0.7071067812, -0.7071067812), z_dir=(0, 0.7071067812, 0.7071067812))):
        with BuildLine():
            ThreePointArc((0, -2.3), (2.3, 0), (0, 2.3))
            Line((0, 2.3), (0, -2.3))
        make_face()
    revolve(axis=Axis((32.8, -23.2, 33.7), (-1, 0, 0)), mode=Mode.SUBTRACT)


with BuildPart() as f1_2:
    add(f1_1.part)

    # F22_t17: cut F22_tool18
    add(f22_tool18.part, mode=Mode.SUBTRACT)


with BuildPart() as f22_tool25:
    # F22_s26 → F22_t27 (new body)
    with BuildSketch(Plane.XY.offset(33.7)):
        with BuildLine():
            ThreePointArc((13.2, -25.5), (14.8263455967, -24.8263455967), (15.5, -23.2))
            Line((15.5, -23.2), (15.5, -25.5))
            Line((15.5, -25.5), (13.2, -25.5))
        make_face()
    extrude(amount=-F22_T27_DEPTH)

    split(bisect_by=Plane.XY.offset(33.5), keep=Keep.BOTTOM)


with BuildPart() as f22_tool29:
    # F22_s30 → F22_t31 (new body)
    with BuildSketch(Plane.YZ.offset(9.75)):
        with BuildLine():
            ThreePointArc((-25.5, 31.2), (-24.8263455967, 32.8263455967), (-23.2, 33.5))
            Line((-23.2, 33.5), (-25.5, 33.5))
            Line((-25.5, 33.5), (-25.5, 31.2))
        make_face()
    extrude(amount=F22_T31_DEPTH)

    split(bisect_by=Plane.YZ.offset(15.5), keep=Keep.BOTTOM)


with BuildPart() as f22_tool25_1:
    add(f22_tool25.part)

    # F22_t33: intersect F22_tool29
    add(f22_tool29.part, mode=Mode.INTERSECT)


with BuildPart() as f1_3:
    add(f1_2.part)

    # F22_t23: cut F22_tool25
    add(f22_tool25_1.part, mode=Mode.SUBTRACT)


with BuildPart() as f22_tool36:
    # F22_s37 → F22_t38 (new body)
    with BuildSketch(Plane.YZ.offset(15.5)):
        with BuildLine():
            ThreePointArc((-25.5, 31.2), (-24.8263455967, 32.8263455967), (-23.2, 33.5))
            Line((-23.2, 33.5), (-25.5, 33.5))
            Line((-25.5, 33.5), (-25.5, 31.2))
        make_face()
    extrude(amount=F22_T38_DEPTH)

    split(bisect_by=Plane.YZ.offset(30.5), keep=Keep.TOP)


with BuildPart() as f22_tool40:
    # F22_s41 → F22_t42 (new body)
    with BuildSketch(Plane.XY.offset(33.7)):
        with BuildLine():
            ThreePointArc((32.8, -25.5), (31.1736544033, -24.8263455967), (30.5, -23.2))
            Line((30.5, -23.2), (30.5, -25.5))
            Line((30.5, -25.5), (32.8, -25.5))
        make_face()
    extrude(amount=-F22_T42_DEPTH)

    split(bisect_by=Plane.XY.offset(33.5), keep=Keep.BOTTOM)


with BuildPart() as f22_tool36_1:
    add(f22_tool36.part)

    # F22_t44: intersect F22_tool40
    add(f22_tool40.part, mode=Mode.INTERSECT)


with BuildPart() as f1_4:
    add(f1_3.part)

    # F22_t34: cut F22_tool36
    add(f22_tool36_1.part, mode=Mode.SUBTRACT)

    # F23: fillet of radius 7.5 on 8 edges, made by hand

    # F23_s2 → F23_t1 (join)
    with BuildSketch(Plane.XZ.offset(3.5)):
        with BuildLine():
            ThreePointArc((15.5, 43.5), (13.3033008589, 38.1966991411), (8, 36))
            Line((8, 36), (15.5, 36))
            Line((15.5, 36), (15.5, 43.5))
        make_face()
        with BuildLine():
            ThreePointArc((38, 36), (32.6966991411, 38.1966991411), (30.5, 43.5))
            Line((30.5, 43.5), (30.5, 36))
            Line((30.5, 36), (38, 36))
        make_face()
    extrude(amount=F23_T1_DEPTH)

    # F23_s4 → F23_t3 (join)
    with BuildSketch(Plane.XZ.offset(-25.5)):
        with BuildLine():
            ThreePointArc((15.5, 43.5), (13.3033008589, 38.1966991411), (8, 36))
            Line((8, 36), (15.5, 36))
            Line((15.5, 36), (15.5, 43.5))
        make_face()
        with BuildLine():
            ThreePointArc((30.5, 43.5), (32.6966991411, 38.1966991411), (38, 36))
            Line((38, 36), (30.5, 36))
            Line((30.5, 36), (30.5, 43.5))
        make_face()
    extrude(amount=F23_T3_DEPTH)


with BuildPart() as f23_tool6:
    # F23_s7 → F23_t8 (new body)
    with BuildSketch(Plane.XZ.offset(27.25)):
        with BuildLine():
            ThreePointArc((38, 36), (32.6966991411, 38.1966991411), (30.5, 43.5))
            Line((30.5, 43.5), (30.5, 36))
            Line((30.5, 36), (38, 36))
        make_face()
    extrude(amount=-F23_T8_DEPTH)

    split(bisect_by=Plane.YZ.offset(35), keep=Keep.TOP)

    split(bisect_by=Plane.XZ.offset(3.5), keep=Keep.BOTTOM)


with BuildPart() as f1_5:
    add(f1_4.part)

    # F23_t5: union F23_tool6
    add(f23_tool6.part)


with BuildPart() as f23_tool12:
    # F23_s13 → F23_t14 (new body)
    with BuildSketch(Plane.XZ.offset(-1.75)):
        with BuildLine():
            ThreePointArc((30.5, 43.5), (32.6966991411, 38.1966991411), (38, 36))
            Line((38, 36), (30.5, 36))
            Line((30.5, 36), (30.5, 43.5))
        make_face()
    extrude(amount=-F23_T14_DEPTH)

    split(bisect_by=Plane.YZ.offset(35), keep=Keep.TOP)


with BuildPart() as f1_6:
    add(f1_5.part)

    # F23_t11: union F23_tool12
    add(f23_tool12.part)

    # F23_s17 → F23_t16 (cut)
    with BuildSketch(Plane.XZ.offset(-44.25)):
        with BuildLine():
            ThreePointArc((23, 61.25), (17.6966991411, 59.0533008589), (15.5, 53.75))
            Line((15.5, 53.75), (15.5, 61.25))
            Line((15.5, 61.25), (23, 61.25))
        make_face()
        with BuildLine():
            ThreePointArc((30.5, 53.75), (28.3033008589, 59.0533008589), (23, 61.25))
            Line((23, 61.25), (30.5, 61.25))
            Line((30.5, 61.25), (30.5, 53.75))
        make_face()
    extrude(amount=F23_T16_DEPTH, mode=Mode.SUBTRACT)

    # F23_s19 → F23_t18 (cut)
    with BuildSketch(Plane.XZ.offset(-15.25)):
        with BuildLine():
            ThreePointArc((30.5, 53.75), (28.3033008589, 59.0533008589), (23, 61.25))
            Line((23, 61.25), (30.5, 61.25))
            Line((30.5, 61.25), (30.5, 53.75))
        make_face()
        with BuildLine():
            ThreePointArc((23, 61.25), (17.6966991411, 59.0533008589), (15.5, 53.75))
            Line((15.5, 53.75), (15.5, 61.25))
            Line((15.5, 61.25), (23, 61.25))
        make_face()
    extrude(amount=F23_T18_DEPTH, mode=Mode.SUBTRACT)


solid = f1_6.part
